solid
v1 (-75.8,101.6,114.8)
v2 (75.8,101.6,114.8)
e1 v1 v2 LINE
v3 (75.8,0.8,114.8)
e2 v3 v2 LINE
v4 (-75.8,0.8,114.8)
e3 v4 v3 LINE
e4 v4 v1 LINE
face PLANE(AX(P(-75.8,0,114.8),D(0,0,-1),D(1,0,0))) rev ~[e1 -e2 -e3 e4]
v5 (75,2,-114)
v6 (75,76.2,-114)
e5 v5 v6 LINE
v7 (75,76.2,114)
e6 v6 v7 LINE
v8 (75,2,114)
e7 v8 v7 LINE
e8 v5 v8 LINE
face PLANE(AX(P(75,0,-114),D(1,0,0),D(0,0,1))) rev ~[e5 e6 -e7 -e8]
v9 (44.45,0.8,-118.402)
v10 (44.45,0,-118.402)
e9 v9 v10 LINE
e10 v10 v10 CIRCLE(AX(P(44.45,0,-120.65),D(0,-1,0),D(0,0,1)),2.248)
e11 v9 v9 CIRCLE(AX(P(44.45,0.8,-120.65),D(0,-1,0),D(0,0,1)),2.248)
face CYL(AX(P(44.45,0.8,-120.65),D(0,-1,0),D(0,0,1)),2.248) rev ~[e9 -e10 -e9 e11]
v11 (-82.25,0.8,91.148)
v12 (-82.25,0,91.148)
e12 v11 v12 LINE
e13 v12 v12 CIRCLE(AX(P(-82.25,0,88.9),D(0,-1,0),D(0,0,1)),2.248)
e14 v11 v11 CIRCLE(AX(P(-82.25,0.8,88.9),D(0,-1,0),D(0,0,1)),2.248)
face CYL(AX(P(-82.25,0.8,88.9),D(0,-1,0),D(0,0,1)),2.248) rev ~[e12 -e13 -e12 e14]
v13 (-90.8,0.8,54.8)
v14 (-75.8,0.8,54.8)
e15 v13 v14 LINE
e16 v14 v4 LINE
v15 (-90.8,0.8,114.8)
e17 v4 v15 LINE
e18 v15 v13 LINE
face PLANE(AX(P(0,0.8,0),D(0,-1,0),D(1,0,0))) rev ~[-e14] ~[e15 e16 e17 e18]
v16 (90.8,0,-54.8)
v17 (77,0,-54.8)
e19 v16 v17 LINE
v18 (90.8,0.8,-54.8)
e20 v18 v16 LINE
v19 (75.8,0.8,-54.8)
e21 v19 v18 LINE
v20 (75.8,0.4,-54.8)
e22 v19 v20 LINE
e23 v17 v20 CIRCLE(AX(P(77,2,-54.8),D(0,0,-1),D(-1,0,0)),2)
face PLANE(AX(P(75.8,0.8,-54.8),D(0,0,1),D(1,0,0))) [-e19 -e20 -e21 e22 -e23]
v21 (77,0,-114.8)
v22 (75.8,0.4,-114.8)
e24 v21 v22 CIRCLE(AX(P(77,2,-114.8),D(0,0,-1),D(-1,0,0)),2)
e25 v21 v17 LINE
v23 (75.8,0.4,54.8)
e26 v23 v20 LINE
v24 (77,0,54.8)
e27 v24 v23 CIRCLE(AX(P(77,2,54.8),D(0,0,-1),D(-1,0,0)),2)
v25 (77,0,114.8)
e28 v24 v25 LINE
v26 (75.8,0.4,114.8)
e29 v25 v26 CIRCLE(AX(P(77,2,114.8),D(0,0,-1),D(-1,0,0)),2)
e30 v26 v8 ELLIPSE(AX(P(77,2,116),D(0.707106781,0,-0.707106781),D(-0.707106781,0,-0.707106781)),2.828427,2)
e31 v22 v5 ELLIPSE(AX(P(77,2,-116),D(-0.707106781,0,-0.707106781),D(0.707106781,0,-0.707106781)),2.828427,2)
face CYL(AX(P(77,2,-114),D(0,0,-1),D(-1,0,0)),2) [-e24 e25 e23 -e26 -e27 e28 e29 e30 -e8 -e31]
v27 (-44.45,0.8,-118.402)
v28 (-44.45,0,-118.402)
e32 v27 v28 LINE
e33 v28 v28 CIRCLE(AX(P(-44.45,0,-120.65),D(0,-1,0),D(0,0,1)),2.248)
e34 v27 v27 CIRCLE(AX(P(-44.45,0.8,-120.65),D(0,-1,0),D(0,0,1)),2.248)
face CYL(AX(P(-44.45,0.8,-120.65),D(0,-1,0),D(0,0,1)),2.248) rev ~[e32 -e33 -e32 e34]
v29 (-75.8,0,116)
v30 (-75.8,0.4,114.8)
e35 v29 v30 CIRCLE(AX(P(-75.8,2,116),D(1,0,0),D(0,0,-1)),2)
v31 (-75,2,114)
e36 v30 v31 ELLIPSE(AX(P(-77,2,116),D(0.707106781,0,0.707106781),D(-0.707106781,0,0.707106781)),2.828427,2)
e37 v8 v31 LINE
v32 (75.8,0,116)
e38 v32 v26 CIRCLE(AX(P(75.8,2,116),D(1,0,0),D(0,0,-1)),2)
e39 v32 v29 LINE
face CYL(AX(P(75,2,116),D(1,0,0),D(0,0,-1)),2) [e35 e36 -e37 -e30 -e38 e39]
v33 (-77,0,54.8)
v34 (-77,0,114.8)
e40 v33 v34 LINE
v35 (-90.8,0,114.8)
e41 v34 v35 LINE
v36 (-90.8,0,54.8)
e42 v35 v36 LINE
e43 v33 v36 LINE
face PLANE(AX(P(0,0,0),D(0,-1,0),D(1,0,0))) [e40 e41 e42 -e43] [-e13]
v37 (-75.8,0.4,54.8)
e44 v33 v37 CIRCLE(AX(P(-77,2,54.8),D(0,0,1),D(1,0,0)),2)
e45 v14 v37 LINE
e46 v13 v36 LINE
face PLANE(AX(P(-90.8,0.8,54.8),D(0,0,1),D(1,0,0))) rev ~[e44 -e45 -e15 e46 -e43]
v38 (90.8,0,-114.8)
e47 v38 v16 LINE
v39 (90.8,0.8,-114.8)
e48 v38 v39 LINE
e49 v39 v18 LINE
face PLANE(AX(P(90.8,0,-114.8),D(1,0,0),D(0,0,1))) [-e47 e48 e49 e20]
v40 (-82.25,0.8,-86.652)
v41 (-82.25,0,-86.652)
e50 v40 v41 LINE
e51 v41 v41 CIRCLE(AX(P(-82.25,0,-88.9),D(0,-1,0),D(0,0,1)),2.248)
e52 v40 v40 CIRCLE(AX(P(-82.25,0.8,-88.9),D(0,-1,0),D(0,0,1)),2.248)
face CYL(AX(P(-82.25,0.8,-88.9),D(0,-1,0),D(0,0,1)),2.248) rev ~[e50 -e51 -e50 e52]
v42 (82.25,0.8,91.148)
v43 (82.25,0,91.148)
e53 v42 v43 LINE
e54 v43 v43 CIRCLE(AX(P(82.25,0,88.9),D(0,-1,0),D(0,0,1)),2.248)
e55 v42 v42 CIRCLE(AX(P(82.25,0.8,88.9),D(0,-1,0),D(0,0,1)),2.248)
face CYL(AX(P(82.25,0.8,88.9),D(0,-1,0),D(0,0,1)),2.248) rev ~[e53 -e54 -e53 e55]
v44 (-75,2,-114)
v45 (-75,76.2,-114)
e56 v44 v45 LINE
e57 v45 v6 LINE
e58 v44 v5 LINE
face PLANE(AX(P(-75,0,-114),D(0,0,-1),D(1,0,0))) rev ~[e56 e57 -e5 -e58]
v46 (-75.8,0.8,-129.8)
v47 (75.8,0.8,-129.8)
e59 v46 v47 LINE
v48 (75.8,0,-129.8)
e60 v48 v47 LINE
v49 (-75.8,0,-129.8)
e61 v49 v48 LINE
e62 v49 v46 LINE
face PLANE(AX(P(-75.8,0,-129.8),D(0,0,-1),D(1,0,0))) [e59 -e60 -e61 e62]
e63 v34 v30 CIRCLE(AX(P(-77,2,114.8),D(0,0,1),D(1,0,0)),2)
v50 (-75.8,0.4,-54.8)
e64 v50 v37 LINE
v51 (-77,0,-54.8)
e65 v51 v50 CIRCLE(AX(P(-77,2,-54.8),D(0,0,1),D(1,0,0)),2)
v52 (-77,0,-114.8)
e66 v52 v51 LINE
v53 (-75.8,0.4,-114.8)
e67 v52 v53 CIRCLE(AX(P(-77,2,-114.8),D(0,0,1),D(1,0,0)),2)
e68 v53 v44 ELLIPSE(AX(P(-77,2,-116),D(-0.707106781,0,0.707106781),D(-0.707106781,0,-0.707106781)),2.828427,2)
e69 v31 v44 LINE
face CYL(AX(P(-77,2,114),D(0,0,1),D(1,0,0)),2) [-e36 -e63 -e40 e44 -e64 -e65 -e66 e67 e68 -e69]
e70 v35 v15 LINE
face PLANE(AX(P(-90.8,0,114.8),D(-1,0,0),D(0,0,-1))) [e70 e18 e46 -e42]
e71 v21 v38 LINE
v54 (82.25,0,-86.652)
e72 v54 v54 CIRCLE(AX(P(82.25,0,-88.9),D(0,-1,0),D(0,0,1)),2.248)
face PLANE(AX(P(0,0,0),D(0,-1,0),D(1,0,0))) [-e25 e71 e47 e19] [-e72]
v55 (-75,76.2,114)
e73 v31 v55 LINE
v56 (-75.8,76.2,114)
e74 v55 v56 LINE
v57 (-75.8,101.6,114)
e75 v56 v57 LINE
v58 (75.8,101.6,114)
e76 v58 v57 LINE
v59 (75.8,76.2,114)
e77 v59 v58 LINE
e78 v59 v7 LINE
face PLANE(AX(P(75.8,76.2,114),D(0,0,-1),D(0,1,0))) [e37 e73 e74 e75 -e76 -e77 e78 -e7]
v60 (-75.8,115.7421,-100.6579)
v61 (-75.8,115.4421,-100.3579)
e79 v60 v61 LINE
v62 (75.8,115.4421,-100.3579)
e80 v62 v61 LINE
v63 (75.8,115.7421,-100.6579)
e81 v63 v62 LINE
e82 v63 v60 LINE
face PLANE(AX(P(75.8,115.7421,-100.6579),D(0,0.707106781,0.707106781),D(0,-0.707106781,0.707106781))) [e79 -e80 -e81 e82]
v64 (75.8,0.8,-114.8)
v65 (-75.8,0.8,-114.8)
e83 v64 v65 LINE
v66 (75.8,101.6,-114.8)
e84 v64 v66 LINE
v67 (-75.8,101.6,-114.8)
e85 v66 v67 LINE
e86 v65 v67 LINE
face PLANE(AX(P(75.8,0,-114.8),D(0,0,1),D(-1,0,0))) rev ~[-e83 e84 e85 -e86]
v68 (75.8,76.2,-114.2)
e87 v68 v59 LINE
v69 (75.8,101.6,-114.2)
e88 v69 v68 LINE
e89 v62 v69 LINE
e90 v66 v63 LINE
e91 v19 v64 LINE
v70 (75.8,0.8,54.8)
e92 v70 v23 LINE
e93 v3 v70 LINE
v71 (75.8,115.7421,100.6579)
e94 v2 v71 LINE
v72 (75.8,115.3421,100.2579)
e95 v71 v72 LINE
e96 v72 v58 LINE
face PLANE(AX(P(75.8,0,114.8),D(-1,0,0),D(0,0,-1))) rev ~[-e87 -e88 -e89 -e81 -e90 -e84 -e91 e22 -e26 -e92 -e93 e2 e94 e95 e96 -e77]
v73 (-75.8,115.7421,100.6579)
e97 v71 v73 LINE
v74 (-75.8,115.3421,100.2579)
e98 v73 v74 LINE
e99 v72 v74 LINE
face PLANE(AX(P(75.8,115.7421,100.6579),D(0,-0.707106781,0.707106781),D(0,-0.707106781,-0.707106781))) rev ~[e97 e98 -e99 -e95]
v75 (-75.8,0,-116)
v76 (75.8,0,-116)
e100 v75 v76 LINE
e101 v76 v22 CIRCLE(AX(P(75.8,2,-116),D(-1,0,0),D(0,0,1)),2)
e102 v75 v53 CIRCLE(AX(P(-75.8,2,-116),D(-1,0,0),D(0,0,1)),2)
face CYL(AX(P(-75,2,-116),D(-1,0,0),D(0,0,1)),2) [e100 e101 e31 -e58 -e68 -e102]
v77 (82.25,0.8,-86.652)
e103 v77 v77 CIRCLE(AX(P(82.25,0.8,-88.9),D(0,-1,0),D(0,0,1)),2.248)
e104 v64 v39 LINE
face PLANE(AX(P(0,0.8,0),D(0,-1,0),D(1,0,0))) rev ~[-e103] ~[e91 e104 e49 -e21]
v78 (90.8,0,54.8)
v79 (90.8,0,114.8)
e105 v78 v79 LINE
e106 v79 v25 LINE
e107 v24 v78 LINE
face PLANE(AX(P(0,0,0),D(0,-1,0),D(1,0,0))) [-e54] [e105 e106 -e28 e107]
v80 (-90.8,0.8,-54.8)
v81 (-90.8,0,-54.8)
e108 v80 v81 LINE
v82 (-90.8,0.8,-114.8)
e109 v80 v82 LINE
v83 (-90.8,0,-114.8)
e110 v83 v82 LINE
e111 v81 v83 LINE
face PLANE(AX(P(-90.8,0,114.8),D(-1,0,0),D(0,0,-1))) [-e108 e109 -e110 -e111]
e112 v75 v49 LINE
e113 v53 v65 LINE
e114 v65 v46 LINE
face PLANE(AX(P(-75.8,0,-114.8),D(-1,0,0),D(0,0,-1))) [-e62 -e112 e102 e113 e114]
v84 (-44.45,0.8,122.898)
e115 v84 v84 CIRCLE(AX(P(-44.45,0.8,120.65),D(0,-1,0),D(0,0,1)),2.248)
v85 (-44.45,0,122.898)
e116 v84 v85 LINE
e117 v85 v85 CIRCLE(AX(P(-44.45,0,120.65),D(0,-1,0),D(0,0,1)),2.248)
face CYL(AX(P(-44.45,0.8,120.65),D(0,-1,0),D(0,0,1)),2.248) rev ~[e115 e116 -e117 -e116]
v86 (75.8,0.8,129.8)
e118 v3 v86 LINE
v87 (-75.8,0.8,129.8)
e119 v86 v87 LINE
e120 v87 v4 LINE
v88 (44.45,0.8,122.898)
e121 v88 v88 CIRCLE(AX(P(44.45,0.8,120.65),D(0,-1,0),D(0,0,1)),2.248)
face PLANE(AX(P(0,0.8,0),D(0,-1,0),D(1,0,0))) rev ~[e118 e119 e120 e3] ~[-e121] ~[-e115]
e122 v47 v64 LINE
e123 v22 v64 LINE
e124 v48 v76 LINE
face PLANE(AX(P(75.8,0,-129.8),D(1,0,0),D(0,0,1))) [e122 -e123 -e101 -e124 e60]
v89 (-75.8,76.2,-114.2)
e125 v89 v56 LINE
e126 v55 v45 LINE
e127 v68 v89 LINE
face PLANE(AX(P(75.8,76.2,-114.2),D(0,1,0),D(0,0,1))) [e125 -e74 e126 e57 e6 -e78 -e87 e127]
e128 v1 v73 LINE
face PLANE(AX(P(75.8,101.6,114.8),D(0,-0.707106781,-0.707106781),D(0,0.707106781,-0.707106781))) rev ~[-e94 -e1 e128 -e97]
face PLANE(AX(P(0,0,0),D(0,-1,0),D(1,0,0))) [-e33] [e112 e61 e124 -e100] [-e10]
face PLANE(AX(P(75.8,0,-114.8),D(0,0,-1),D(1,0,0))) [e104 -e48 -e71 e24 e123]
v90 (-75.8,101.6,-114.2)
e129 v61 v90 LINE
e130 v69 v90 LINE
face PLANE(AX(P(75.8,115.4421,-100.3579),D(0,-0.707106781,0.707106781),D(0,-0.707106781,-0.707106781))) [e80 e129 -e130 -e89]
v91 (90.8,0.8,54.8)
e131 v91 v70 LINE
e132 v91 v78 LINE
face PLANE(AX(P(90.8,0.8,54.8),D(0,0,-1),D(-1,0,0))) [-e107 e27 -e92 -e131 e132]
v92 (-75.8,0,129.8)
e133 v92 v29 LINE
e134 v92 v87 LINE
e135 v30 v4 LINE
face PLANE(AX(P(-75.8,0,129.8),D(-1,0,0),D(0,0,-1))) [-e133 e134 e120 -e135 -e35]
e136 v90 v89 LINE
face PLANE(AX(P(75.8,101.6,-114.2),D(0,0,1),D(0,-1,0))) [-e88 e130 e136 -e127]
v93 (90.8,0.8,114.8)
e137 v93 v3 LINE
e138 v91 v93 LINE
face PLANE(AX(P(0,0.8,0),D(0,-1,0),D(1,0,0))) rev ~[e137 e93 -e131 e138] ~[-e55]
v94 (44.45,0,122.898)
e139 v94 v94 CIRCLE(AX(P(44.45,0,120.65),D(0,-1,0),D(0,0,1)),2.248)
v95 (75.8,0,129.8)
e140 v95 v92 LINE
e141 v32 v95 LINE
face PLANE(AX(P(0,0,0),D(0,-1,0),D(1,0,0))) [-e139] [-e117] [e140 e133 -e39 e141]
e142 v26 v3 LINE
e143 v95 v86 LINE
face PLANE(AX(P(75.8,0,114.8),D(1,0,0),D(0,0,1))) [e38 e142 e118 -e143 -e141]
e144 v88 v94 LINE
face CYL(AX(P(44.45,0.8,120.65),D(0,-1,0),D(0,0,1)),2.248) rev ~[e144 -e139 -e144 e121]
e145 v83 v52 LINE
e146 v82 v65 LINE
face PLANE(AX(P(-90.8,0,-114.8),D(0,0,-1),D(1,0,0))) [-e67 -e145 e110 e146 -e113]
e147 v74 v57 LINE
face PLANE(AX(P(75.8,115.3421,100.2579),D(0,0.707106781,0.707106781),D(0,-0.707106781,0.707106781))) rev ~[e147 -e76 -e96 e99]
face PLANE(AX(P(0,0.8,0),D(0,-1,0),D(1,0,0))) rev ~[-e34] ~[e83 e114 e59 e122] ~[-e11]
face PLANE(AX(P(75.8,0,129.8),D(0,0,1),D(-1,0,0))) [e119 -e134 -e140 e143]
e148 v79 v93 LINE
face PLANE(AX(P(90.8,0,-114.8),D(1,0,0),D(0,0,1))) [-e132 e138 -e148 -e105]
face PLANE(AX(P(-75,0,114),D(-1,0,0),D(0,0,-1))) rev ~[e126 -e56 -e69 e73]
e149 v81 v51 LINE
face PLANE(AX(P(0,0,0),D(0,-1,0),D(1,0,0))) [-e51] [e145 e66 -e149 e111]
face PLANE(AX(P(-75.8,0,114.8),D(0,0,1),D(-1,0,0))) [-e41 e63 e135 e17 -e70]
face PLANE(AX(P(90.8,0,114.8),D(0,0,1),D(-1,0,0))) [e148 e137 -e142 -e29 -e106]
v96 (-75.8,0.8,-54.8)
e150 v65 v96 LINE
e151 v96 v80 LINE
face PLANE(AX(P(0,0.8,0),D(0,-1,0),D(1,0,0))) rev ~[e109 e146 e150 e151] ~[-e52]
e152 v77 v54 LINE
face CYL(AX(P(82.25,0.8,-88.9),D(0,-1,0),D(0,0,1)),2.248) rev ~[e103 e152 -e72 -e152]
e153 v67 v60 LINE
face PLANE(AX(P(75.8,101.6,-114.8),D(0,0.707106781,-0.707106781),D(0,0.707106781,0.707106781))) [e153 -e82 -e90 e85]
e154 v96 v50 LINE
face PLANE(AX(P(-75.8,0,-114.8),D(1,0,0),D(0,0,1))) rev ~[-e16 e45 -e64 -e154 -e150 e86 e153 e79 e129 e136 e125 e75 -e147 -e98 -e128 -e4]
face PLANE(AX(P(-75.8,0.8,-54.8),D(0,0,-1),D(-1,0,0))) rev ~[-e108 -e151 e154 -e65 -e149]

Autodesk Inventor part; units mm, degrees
ref_plane "YZ Plane" through (0, 0, 0) normal (1, 0, 0) x (0, 1, 0)
ref_plane "XZ Plane" through (0, 0, 0) normal (0, 1, 0) x (-1, 0, 0)
ref_plane "XY Plane" through (0, 0, 0) normal (0, 0, 1) x (1, 0, 0)
sketch "Sketch1" plane through (0, 0, 0) normal (0, 1, 0) x (-1, 0, 0)
  line L0 (-75, 114) -> (75, 114)
  line L1 (75, 114) -> (75, -114)
  line L2 (75, -114) -> (-75, -114)
  line L3 (-75, -114) -> (-75, 114)
  line L4 (-75, 114) -> (75, -114) construction
  line L5 (75, 114) -> (-75, -114) construction
  line L6 (75.8, 114.8) -> (-75.8, 114.8)
  line L7 (-75.8, 114.8) -> (-75.8, -114.8)
  line L8 (-75.8, -114.8) -> (75.8, -114.8)
  line L9 (75.8, -114.8) -> (75.8, 114.8)
  point P0 (0, 0)
  dimension "d0" = 150
  dimension "d1" = 228
  dimension "d2" = 0.8
extrude "Extrusion1" add sketch "Sketch1" along normal blind 101.6
sketch "Sketch3" plane through (0, 0, 0) normal (0, -1, 0) x (1, 0, 0)
  line L0 (75.8, 114.8) -> (75.8, -114.8) projected
  line L1 (75.8, -114.8) -> (-75.8, -114.8) projected
  line L2 (75.8, 114.8) -> (75.8, -114.8)
  line L3 (75.8, -114.8) -> (90.8, -114.8)
  line L4 (90.8, -114.8) -> (90.8, 114.8)
  line L5 (90.8, 114.8) -> (75.8, 114.8)
  line L6 (75.8, -114.8) -> (-75.8, -114.8)
  line L7 (-75.8, -114.8) -> (-75.8, -129.8)
  line L8 (-75.8, -129.8) -> (75.8, -129.8)
  line L9 (75.8, -129.8) -> (75.8, -114.8)
  line L10 (-75.8, 114.8) -> (75.8, 114.8) projected
  line L11 (-75.8, -114.8) -> (-75.8, 114.8)
  line L12 (-75.8, 114.8) -> (-90.8, 114.8)
  line L13 (-90.8, 114.8) -> (-90.8, -114.8)
  line L14 (-90.8, -114.8) -> (-75.8, -114.8)
  line L15 (-75.8, 114.8) -> (75.8, 114.8)
  line L16 (75.8, 114.8) -> (75.8, 129.8)
  line L17 (75.8, 129.8) -> (-75.8, 129.8)
  line L18 (-75.8, 129.8) -> (-75.8, 114.8)
  point P0 (0, 0)
  dimension "d11" = 15
  dimension "d12" = 15
  dimension "d13" = 15
  dimension "d14" = 15
extrude "Extrusion3" add sketch "Sketch3" against normal blind 0.8 contours L5 L4 L3 L0 | L10 L18 L17 L16 | L9 L8 L7 L1 | L11 L14 L13 L12
fillet "Fillet1" radius 2 4 edges at (75, 0, 0) (0, 0, -114) (-75, 0, 0) (0, 0, 114)
sketch "Sketch4" plane through (0, 0.8, 0) normal (0, 1, 0) x (1, 0, 0)
  line L0 (82.25, 120.65) -> (-82.25, 120.65) construction
  line L1 (-82.25, 120.65) -> (-82.25, -120.65) construction
  line L2 (-82.25, -120.65) -> (82.25, -120.65) construction
  line L3 (82.25, -120.65) -> (82.25, 120.65) construction
  line L4 (82.25, 120.65) -> (-82.25, -120.65) construction
  line L5 (-82.25, 120.65) -> (82.25, -120.65) construction
  line L6 (0, 0) -> (0, -60) construction
  line L7 (0, 0) -> (60, 0) construction
  point P0 (44.45, 120.65)
  point P1 (-44.45, 120.65)
  point P2 (-82.25, 88.9)
  point P3 (-82.25, 0)
  point P4 (-82.25, -88.9)
  point P5 (-44.45, -120.65)
  point P6 (44.45, -120.65)
  point P7 (82.25, -88.9)
  point P8 (82.25, 0)
  point P9 (82.25, 88.9)
  dimension "d18" = 164.5
  dimension "d19" = 241.3
  dimension "d20" = 88.9
  dimension "d21" = 60
  dimension "d22" = 90
  dimension "d23" = 88.9
  dimension "d24" = 88.9
hole "Hole1" at (44.45, 0.8, -120.65) at (-44.45, 0.8, -120.65) at (-82.25, 0.8, -88.9) at (-82.25, 0.8, 0) at (-82.25, 0.8, 88.9) at (-44.45, 0.8, 120.65) at (44.45, 0.8, 120.65) at (82.25, 0.8, 88.9) at (82.25, 0.8, 0) at (82.25, 0.8, -88.9) direction (0, -1, 0) diameter 4.496 end through all clearance for "Flat Head Machine Screw (82)" size "#8" standard "Ansi Unified Screw Threads"
sketch "Sketch8" plane through (75.8, 101.6, 114.8) normal (1, 0, 0) x (0, 0, -1)
  line L0 (0.8, -99.6) -> (0.8, 0) projected
  line L1 (0.8, 0) -> (229, 0)
  line L2 (229, 0) -> (229, -25.4)
  line L3 (229, -25.4) -> (0.8, -25.4)
  line L4 (0.8, -25.4) -> (0.8, 0)
  point P0 (114.8, -101.6)
  dimension "d48" = 25.4
extrude "Extrusion7" cut sketch "Sketch8" against normal through all
sketch "Sketch9" plane through (75.8, 0.8, 114.8) normal (1, 0, 0) x (0, 0, -1)
  line L0 (0, 100.8) -> (14.1421, 114.9421)
  line L1 (0, 100.8) -> (20, 100.8) construction
  line L2 (14.5421, 114.5421) -> (0.8, 100.8)
  line L3 (14.1421, 114.9421) -> (14.5421, 114.5421)
  line L4 (229.6, 0) -> (229.6, 100.8) projected
  line L5 (229.6, 100.8) -> (215.4579, 114.9421)
  line L6 (229.6, 100.8) -> (249.6, 100.8) construction
  line L7 (215.1579, 114.6421) -> (229, 100.8)
  line L8 (229, 100.8) -> (229.6, 100.8) projected
  line L9 (229, 100.8) -> (229.6, 100.8)
  line L10 (215.4579, 114.9421) -> (215.1579, 114.6421)
  line L11 (0.8, 100.8) -> (0, 100.8) projected
  line L12 (0, 100.8) -> (0.8, 100.8)
  point P0 (114.8, -0.8)
  dimension "d51" = 20
  dimension "d52" = 45
  dimension "d53" = 20
  dimension "d54" = 135
extrude "Extrusion8" add sketch "Sketch9" against normal up to surface (151.6 mm away)
sketch "Sketch10" plane through (0, 0.8, 0) normal (0, 1, 0) x (1, 0, 0)
  line L0 (75.8, 114.2) -> (75.8, -114) projected
  line L1 (-75.8, -114) -> (-75.8, 114.2) projected
  line L2 (-75.8, -114.8) -> (75.8, -114.8) projected
  line L3 (75.8, 114.8) -> (-75.8, 114.8) projected
  line L4 (90.8, -114.8) -> (90.8, 114.8) projected
  line L5 (90.8, -54.8) -> (75.8, -54.8)
  line L6 (75.8, -54.8) -> (75.8, 54.8)
  line L7 (75.8, 54.8) -> (90.8, 54.8)
  line L8 (90.8, 54.8) -> (90.8, -54.8)
  line L9 (90.8, 114.8) -> (75.8, 114.8) projected
  line L10 (75.8, -114.8) -> (90.8, -114.8) projected
  line L11 (0, 0) -> (0, 22) construction
  line L12 (-90.8, -54.8) -> (-75.8, -54.8)
  line L13 (-75.8, -54.8) -> (-75.8, 54.8)
  line L14 (-75.8, 54.8) -> (-90.8, 54.8)
  line L15 (-90.8, 54.8) -> (-90.8, -54.8)
  dimension "d57" = 60
  dimension "d58" = 60
extrude "Extrusion9" cut sketch "Sketch10" against normal through all
properties part number "chimneyHousing"
